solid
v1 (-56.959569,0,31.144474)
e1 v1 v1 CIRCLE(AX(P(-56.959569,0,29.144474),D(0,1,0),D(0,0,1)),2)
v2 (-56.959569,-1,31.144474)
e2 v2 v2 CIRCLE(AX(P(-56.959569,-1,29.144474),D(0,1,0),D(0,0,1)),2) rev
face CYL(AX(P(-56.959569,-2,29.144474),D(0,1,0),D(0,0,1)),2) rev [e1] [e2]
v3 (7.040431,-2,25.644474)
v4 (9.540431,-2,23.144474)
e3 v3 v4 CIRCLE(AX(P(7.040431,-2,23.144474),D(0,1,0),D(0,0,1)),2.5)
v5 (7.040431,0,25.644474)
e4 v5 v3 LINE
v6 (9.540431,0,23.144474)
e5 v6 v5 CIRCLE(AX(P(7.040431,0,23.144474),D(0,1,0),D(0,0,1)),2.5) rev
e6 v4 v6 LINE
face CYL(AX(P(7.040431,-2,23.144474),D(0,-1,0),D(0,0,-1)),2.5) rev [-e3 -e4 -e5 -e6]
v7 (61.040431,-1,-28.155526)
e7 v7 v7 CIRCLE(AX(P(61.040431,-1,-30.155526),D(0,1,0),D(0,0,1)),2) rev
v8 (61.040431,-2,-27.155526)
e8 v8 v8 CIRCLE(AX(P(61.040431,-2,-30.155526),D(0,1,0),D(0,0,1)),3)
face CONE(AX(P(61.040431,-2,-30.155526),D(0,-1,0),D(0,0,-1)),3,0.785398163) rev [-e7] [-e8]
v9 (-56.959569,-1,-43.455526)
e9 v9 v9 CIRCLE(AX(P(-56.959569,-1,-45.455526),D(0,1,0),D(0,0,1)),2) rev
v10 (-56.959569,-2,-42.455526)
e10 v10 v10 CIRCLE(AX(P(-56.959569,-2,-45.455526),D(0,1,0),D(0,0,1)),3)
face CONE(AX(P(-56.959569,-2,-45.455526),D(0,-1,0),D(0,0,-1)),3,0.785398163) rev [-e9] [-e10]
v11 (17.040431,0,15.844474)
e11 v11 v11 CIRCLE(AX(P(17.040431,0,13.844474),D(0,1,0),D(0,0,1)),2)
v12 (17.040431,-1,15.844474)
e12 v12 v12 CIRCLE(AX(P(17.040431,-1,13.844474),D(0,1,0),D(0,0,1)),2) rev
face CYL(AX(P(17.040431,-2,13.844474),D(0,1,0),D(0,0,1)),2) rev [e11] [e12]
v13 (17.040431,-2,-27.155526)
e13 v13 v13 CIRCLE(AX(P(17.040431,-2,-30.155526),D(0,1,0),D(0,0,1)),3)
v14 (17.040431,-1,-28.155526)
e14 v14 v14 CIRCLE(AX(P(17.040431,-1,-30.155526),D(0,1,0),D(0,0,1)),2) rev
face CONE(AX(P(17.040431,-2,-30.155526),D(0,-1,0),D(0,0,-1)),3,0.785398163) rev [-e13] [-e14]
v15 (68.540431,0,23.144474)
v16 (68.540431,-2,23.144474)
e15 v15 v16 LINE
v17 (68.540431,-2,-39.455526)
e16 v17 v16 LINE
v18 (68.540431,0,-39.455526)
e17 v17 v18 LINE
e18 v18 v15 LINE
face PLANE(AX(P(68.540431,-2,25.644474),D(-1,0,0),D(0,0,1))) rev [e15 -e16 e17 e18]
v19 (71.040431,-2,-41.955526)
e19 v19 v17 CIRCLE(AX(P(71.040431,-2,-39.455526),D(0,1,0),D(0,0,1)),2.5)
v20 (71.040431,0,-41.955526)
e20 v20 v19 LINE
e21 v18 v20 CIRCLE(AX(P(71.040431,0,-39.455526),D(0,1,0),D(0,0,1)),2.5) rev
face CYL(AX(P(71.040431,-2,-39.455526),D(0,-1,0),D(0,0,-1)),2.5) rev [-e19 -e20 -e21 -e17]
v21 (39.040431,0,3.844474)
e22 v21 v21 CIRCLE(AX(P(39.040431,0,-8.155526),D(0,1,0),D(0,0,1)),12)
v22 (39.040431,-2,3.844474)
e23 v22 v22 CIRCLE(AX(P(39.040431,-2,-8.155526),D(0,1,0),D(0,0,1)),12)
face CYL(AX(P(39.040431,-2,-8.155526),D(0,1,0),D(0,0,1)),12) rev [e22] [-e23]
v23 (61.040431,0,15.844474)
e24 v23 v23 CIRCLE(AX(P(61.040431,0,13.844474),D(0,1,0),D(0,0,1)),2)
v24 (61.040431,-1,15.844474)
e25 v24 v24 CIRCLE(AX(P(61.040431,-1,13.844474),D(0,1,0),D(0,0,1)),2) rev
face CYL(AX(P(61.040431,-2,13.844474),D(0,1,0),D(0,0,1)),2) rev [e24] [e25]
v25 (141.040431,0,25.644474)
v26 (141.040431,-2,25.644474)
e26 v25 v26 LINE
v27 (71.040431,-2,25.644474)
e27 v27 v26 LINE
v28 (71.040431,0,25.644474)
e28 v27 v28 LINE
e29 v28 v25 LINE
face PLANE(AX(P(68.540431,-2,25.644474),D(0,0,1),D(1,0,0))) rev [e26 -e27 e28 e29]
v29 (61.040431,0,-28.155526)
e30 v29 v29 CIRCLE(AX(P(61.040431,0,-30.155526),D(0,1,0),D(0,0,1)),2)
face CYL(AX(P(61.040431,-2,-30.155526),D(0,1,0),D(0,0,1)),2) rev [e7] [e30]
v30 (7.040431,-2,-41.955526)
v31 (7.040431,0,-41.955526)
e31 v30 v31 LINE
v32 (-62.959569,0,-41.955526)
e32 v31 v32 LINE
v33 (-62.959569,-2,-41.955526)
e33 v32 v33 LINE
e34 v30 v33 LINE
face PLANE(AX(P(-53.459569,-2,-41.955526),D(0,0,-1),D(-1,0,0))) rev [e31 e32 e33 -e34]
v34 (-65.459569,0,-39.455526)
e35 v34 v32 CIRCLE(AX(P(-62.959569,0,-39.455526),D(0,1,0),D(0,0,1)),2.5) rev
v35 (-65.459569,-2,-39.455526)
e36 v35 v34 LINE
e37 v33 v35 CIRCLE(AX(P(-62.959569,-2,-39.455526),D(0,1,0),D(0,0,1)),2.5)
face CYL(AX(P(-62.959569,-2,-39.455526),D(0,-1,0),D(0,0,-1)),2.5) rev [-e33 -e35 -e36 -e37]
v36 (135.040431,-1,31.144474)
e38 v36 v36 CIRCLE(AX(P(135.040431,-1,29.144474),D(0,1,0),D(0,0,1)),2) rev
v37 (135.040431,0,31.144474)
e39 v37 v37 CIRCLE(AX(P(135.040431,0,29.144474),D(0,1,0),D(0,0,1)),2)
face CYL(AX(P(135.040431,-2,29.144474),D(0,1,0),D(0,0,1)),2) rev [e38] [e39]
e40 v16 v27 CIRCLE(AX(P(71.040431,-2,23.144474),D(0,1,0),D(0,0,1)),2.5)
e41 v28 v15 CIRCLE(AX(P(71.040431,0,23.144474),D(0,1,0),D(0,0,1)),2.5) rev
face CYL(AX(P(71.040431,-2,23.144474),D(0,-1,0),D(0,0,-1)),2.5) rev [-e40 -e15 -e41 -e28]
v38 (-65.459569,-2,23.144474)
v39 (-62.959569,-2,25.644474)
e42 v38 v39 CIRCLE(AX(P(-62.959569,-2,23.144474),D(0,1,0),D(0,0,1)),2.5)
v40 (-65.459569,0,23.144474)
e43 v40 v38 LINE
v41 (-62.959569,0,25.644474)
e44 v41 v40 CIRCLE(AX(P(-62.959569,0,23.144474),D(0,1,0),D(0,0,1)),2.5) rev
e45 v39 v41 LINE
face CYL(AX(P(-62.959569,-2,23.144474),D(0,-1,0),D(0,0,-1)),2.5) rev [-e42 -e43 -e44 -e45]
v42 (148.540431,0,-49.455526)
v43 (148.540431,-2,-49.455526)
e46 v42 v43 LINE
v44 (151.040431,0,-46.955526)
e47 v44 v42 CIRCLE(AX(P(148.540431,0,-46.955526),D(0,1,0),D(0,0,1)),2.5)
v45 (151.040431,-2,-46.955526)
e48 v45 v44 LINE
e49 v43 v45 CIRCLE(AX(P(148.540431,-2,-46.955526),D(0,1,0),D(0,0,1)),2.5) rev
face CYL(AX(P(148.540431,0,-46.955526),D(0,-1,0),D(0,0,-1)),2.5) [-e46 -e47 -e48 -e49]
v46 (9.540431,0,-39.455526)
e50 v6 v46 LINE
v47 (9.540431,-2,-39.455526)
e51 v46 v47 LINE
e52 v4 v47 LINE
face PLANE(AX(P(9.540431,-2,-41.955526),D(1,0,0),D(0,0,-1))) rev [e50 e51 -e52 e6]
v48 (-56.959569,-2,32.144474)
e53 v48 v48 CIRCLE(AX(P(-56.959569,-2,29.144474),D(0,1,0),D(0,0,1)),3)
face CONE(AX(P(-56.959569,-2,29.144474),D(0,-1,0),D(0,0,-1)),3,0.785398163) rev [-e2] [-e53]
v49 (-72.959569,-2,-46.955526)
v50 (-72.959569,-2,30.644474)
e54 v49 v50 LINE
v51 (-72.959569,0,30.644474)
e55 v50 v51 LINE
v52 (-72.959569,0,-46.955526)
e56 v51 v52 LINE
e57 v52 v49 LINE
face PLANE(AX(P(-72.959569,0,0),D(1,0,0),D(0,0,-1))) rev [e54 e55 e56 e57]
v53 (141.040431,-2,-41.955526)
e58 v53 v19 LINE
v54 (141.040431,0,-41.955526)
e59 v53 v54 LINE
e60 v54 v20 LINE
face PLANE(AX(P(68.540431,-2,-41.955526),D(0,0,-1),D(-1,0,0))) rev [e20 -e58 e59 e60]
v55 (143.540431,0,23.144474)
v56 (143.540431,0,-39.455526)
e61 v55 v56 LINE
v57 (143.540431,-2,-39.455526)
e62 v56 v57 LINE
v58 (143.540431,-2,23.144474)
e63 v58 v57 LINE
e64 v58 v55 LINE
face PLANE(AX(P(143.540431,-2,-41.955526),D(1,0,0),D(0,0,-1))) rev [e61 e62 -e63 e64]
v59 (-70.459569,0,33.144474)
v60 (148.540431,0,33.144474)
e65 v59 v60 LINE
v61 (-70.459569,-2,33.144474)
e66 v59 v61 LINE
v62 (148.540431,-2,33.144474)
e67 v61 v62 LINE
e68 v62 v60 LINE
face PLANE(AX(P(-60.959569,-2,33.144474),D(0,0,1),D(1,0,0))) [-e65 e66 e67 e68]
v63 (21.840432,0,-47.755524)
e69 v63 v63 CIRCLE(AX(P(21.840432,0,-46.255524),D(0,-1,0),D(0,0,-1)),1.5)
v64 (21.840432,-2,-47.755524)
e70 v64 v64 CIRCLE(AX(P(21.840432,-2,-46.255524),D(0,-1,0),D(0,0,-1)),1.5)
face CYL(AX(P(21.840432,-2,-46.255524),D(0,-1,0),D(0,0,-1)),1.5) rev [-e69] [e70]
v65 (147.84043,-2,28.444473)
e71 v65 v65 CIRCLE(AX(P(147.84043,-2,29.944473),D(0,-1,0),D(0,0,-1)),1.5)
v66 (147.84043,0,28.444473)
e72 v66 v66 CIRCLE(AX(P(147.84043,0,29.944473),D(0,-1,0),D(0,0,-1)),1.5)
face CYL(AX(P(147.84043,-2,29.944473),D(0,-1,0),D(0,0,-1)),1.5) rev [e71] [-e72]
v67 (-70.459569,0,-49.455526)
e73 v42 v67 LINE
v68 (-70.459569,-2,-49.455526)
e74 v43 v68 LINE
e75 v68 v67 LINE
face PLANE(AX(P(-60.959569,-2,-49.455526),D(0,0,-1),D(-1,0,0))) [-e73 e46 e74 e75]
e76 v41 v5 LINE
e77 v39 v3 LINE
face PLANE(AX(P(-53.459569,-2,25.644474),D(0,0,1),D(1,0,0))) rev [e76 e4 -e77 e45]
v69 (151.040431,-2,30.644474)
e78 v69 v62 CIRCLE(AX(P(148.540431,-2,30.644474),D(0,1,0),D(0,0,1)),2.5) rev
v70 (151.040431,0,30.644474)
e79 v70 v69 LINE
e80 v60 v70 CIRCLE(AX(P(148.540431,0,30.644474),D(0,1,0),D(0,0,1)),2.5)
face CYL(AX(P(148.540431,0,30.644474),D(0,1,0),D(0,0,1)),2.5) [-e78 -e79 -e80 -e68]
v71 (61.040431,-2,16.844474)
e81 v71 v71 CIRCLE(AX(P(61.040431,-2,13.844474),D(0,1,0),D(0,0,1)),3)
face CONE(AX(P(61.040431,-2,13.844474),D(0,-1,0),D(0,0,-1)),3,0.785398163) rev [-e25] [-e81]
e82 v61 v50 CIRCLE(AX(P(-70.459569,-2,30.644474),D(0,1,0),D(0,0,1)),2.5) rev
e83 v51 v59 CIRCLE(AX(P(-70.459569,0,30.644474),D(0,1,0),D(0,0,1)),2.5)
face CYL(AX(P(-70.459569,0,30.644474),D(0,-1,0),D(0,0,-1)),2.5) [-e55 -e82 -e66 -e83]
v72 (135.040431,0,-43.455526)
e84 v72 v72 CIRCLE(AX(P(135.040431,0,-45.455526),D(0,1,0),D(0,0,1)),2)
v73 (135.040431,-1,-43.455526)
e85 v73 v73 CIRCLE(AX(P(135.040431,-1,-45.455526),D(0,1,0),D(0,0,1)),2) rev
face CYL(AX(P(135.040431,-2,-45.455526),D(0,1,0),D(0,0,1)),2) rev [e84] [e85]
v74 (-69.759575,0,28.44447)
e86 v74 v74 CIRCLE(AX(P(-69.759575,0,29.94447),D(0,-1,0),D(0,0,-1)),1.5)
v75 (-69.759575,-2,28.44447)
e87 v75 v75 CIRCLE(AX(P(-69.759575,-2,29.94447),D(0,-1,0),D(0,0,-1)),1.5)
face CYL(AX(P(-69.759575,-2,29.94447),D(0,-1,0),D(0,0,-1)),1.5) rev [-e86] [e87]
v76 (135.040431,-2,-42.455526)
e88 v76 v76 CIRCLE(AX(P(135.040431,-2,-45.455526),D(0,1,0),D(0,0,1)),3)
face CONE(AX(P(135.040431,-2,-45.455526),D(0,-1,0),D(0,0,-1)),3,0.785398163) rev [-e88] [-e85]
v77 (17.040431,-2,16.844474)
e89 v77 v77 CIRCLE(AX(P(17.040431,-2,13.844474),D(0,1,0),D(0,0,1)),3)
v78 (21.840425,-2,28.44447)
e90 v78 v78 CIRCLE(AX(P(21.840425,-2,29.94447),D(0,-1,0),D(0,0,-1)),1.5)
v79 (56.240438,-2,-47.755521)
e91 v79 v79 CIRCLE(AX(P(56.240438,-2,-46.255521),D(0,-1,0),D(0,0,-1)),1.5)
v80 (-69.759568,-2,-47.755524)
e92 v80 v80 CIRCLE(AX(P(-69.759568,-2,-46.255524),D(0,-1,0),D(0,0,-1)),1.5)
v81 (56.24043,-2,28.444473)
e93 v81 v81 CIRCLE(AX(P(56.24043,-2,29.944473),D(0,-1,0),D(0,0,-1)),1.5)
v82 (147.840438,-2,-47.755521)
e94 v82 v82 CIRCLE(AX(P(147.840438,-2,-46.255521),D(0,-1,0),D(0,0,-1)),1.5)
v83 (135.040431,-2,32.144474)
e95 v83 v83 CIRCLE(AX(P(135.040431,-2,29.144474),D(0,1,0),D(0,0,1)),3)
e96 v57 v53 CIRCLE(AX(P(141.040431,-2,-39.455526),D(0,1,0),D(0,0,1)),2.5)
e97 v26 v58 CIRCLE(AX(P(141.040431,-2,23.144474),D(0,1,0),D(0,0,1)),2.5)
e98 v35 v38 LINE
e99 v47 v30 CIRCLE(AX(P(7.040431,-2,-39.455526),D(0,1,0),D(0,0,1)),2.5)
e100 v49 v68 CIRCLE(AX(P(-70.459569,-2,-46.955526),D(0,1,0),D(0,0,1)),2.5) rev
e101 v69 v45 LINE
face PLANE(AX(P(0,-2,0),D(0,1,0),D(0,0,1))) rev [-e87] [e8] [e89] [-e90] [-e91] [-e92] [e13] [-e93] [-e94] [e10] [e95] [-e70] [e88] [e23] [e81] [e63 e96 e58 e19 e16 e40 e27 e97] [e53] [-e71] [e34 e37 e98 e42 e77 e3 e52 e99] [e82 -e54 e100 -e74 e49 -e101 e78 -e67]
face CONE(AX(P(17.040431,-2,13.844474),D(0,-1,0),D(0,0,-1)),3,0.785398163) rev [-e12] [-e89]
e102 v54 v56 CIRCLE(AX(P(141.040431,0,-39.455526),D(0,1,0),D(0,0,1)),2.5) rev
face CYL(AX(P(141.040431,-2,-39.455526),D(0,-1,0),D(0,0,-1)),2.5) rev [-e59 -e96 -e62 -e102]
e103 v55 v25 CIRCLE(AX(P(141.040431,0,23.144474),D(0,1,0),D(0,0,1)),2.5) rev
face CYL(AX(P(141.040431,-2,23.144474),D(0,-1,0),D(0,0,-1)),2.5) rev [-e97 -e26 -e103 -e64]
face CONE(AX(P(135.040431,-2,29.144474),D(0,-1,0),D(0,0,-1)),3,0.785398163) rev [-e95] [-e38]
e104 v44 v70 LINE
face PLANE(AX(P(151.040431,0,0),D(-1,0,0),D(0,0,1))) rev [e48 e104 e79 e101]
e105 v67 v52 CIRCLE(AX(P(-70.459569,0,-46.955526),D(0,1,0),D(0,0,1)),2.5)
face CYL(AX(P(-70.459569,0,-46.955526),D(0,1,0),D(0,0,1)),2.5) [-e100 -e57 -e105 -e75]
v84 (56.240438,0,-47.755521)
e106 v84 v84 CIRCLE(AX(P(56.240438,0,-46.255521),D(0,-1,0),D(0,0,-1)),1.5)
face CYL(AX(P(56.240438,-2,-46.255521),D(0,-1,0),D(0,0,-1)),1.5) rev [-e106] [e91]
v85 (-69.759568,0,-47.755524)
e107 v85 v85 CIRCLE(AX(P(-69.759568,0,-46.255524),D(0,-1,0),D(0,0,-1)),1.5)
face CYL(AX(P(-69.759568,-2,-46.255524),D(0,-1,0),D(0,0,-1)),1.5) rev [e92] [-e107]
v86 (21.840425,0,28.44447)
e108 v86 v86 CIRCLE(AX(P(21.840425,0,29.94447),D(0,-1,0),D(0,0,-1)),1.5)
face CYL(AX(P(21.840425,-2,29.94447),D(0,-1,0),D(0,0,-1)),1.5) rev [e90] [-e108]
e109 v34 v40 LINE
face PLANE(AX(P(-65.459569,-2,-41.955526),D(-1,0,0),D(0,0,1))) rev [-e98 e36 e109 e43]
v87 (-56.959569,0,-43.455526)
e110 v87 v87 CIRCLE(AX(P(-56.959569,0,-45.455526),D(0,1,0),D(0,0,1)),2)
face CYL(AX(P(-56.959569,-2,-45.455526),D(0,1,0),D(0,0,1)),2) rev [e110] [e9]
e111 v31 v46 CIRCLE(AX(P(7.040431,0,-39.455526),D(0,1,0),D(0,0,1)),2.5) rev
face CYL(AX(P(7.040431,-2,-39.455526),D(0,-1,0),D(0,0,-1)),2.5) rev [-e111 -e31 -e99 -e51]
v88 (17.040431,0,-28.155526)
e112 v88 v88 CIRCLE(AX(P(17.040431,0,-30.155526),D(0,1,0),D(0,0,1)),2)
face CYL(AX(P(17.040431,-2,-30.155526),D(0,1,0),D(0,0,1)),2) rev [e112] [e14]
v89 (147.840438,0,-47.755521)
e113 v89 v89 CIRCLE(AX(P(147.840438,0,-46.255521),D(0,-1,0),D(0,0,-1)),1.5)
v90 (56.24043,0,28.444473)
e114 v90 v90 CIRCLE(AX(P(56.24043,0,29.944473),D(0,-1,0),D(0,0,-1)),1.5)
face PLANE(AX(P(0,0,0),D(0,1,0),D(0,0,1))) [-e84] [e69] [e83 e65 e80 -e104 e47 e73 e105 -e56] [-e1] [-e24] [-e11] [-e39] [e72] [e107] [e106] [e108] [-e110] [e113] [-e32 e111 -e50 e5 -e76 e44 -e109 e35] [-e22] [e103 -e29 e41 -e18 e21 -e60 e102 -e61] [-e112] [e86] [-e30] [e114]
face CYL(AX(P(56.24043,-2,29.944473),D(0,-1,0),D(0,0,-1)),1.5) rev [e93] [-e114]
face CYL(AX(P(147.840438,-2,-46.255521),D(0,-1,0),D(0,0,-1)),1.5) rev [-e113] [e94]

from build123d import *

# Parameters (mm, degrees)
SKETCH1_W             = 200
SKETCH1_H             = 82.6
BASE_FLANGE1_DEPTH    = 2
SKETCH6_R             = 2
CUT_EXTRUDE1_DEPTH    = 148.587569056
SKETCH7_R             = 12
CUT_EXTRUDE2_DEPTH    = 148.587569056
SKETCH8_R             = 2
SKETCH8_W             = 63
SKETCH8_H             = 67.6
CUT_EXTRUDE3_DEPTH    = 148.587569056
CHAMFER1_SIZE         = 1
SKETCH10_W            = 82.6
SKETCH10_H            = 2
BOSS_EXTRUDE1_DEPTH   = 12
SKETCH11_W            = 82.6
SKETCH11_H            = 2
BOSS_EXTRUDE2_DEPTH   = 12
SKETCH12_W            = 12
SKETCH12_H            = 67.6
CUT_EXTRUDE4_DEPTH    = 159.943577694
FILLET2_R             = 2.5
F_3_0MM_DOWEL_HOLE1_D = 3


# Sheet-metal steps are written as plain solids
with BuildPart() as part:
    # Sketch1 → Base-Flange1 (new body)
    with BuildSketch(Plane(origin=(0, 0, 0), x_dir=(1, 0, 0), z_dir=(0, 1, 0))):
        with Locations((39.040431267, 8.155525606)):
            Rectangle(SKETCH1_W, SKETCH1_H)
    extrude(amount=-BASE_FLANGE1_DEPTH)

    # Sketch6 → Cut-Extrude1 (cut, through all)
    with BuildSketch(Plane(origin=(0, 0, 0), x_dir=(1, 0, 0), z_dir=(0, 1, 0))):
        with Locations(Location((-56.959568733, 45.455525606, 0), (0, 0, 270))):
            Circle(SKETCH6_R)
        with Locations(Location((-56.959568733, -29.144474394, 0), (0, 0, 270))):
            Circle(SKETCH6_R)
        with Locations(Location((135.040431267, -29.144474394, 0), (0, 0, 270))):
            Circle(SKETCH6_R)
        with Locations(Location((135.040431267, 45.455525606, 0), (0, 0, 270))):
            Circle(SKETCH6_R)
    extrude(amount=-CUT_EXTRUDE1_DEPTH, mode=Mode.SUBTRACT)

    # Sketch7 → Cut-Extrude2 (cut, through all)
    with BuildSketch(Plane(origin=(0, 0, 0), x_dir=(1, 0, 0), z_dir=(0, 1, 0))):
        with Locations(Location((39.040431267, 8.155525606, 0), (0, 0, 270))):
            Circle(SKETCH7_R)
    extrude(amount=-CUT_EXTRUDE2_DEPTH, mode=Mode.SUBTRACT)

    # Sketch8 → Cut-Extrude3 (cut, through all)
    with BuildSketch(Plane(origin=(0, 0, 0), x_dir=(1, 0, 0), z_dir=(0, 1, 0))):
        with Locations(Location((17.040431267, 30.155525606, 0), (0, 0, 270))):
            Circle(SKETCH8_R)
        with Locations(Location((61.040431267, 30.155525606, 0), (0, 0, 270))):
            Circle(SKETCH8_R)
        with Locations(Location((61.040431267, -13.844474394, 0), (0, 0, 270))):
            Circle(SKETCH8_R)
        with Locations(Location((17.040431267, -13.844474394, 0), (0, 0, 270))):
            Circle(SKETCH8_R)
        with Locations((-21.959568733, 8.155525606)):
            Rectangle(SKETCH8_W, SKETCH8_H)
        with Locations((100.040431267, 8.155525606)):
            Rectangle(SKETCH8_W, SKETCH8_H)
    extrude(amount=-CUT_EXTRUDE3_DEPTH, mode=Mode.SUBTRACT)

    # Chamfer1
    chamfer1_edges = [part.edges().sort_by_distance(p)[0] for p in [
        (135.040431267, -2, -47.455525606),
        (135.040431267, -2, 27.144474394),
        (-56.959568733, -2, 27.144474394),
        (-56.959568733, -2, -47.455525606),
        (17.040431267, -2, 11.844474394),
        (61.040431267, -2, 11.844474394),
        (61.040431267, -2, -32.155525606),
        (17.040431267, -2, -32.155525606),
    ]]
    chamfer(chamfer1_edges, length=CHAMFER1_SIZE)

    # Sketch10 → Boss-Extrude1 (add)
    with BuildSketch(Plane.ZY.offset(60.959568733)):
        with Locations((-8.155525606, -1)):
            Rectangle(SKETCH10_W, SKETCH10_H)
    extrude(amount=BOSS_EXTRUDE1_DEPTH)

    # Sketch11 → Boss-Extrude2 (add)
    with BuildSketch(Plane(origin=(139.040431267, 0, 0), x_dir=(0, 0, -1), z_dir=(1, 0, 0))):
        with Locations((8.155525606, -1)):
            Rectangle(SKETCH11_W, SKETCH11_H)
    extrude(amount=BOSS_EXTRUDE2_DEPTH)

    # Sketch12 → Cut-Extrude4 (cut, through all)
    with BuildSketch(Plane(origin=(0, 0, 0), x_dir=(1, 0, 0), z_dir=(0, 1, 0))):
        with Locations((-59.459568733, 8.155525606)):
            Rectangle(SKETCH12_W, SKETCH12_H)
        with Locations((137.540431267, 8.155525606)):
            Rectangle(SKETCH12_W, SKETCH12_H)
    extrude(amount=-CUT_EXTRUDE4_DEPTH, mode=Mode.SUBTRACT)

    # Fillet2
    fillet2_edges = [part.edges().sort_by_distance(p)[0] for p in [
        (-72.959568733, -1, 33.144474394),
        (-72.959568733, -1, -49.455525606),
        (151.040431267, -1, 33.144474394),
        (151.040431267, -1, -49.455525606),
        (-65.459568733, -1, 25.644474394),
        (-65.459568733, -1, -41.955525606),
        (143.540431267, -1, -41.955525606),
        (143.540431267, -1, 25.644474394),
        (68.540431267, -1, 25.644474394),
        (68.540431267, -1, -41.955525606),
        (9.540431267, -1, -41.955525606),
        (9.540431267, -1, 25.644474394),
    ]]
    fillet(fillet2_edges, radius=FILLET2_R)

    # Ø3.0mm Dowel Hole1 (through all)
    with Locations(Plane(origin=(0, -2, 0), x_dir=(-1, 0, 0), z_dir=(0, -1, 0))):
        with Locations((69.7595751, -29.944469865), (69.759567513, 46.255524386), (-21.840432167, 46.255524386), (-21.84042458, -29.944469865), (-56.240437954, 46.255521078), (-56.240430367, -29.944473174), (-147.840430047, -29.944473174), (-147.840437634, 46.255521078)):
            Hole(F_3_0MM_DOWEL_HOLE1_D / 2)


solid = part.part
